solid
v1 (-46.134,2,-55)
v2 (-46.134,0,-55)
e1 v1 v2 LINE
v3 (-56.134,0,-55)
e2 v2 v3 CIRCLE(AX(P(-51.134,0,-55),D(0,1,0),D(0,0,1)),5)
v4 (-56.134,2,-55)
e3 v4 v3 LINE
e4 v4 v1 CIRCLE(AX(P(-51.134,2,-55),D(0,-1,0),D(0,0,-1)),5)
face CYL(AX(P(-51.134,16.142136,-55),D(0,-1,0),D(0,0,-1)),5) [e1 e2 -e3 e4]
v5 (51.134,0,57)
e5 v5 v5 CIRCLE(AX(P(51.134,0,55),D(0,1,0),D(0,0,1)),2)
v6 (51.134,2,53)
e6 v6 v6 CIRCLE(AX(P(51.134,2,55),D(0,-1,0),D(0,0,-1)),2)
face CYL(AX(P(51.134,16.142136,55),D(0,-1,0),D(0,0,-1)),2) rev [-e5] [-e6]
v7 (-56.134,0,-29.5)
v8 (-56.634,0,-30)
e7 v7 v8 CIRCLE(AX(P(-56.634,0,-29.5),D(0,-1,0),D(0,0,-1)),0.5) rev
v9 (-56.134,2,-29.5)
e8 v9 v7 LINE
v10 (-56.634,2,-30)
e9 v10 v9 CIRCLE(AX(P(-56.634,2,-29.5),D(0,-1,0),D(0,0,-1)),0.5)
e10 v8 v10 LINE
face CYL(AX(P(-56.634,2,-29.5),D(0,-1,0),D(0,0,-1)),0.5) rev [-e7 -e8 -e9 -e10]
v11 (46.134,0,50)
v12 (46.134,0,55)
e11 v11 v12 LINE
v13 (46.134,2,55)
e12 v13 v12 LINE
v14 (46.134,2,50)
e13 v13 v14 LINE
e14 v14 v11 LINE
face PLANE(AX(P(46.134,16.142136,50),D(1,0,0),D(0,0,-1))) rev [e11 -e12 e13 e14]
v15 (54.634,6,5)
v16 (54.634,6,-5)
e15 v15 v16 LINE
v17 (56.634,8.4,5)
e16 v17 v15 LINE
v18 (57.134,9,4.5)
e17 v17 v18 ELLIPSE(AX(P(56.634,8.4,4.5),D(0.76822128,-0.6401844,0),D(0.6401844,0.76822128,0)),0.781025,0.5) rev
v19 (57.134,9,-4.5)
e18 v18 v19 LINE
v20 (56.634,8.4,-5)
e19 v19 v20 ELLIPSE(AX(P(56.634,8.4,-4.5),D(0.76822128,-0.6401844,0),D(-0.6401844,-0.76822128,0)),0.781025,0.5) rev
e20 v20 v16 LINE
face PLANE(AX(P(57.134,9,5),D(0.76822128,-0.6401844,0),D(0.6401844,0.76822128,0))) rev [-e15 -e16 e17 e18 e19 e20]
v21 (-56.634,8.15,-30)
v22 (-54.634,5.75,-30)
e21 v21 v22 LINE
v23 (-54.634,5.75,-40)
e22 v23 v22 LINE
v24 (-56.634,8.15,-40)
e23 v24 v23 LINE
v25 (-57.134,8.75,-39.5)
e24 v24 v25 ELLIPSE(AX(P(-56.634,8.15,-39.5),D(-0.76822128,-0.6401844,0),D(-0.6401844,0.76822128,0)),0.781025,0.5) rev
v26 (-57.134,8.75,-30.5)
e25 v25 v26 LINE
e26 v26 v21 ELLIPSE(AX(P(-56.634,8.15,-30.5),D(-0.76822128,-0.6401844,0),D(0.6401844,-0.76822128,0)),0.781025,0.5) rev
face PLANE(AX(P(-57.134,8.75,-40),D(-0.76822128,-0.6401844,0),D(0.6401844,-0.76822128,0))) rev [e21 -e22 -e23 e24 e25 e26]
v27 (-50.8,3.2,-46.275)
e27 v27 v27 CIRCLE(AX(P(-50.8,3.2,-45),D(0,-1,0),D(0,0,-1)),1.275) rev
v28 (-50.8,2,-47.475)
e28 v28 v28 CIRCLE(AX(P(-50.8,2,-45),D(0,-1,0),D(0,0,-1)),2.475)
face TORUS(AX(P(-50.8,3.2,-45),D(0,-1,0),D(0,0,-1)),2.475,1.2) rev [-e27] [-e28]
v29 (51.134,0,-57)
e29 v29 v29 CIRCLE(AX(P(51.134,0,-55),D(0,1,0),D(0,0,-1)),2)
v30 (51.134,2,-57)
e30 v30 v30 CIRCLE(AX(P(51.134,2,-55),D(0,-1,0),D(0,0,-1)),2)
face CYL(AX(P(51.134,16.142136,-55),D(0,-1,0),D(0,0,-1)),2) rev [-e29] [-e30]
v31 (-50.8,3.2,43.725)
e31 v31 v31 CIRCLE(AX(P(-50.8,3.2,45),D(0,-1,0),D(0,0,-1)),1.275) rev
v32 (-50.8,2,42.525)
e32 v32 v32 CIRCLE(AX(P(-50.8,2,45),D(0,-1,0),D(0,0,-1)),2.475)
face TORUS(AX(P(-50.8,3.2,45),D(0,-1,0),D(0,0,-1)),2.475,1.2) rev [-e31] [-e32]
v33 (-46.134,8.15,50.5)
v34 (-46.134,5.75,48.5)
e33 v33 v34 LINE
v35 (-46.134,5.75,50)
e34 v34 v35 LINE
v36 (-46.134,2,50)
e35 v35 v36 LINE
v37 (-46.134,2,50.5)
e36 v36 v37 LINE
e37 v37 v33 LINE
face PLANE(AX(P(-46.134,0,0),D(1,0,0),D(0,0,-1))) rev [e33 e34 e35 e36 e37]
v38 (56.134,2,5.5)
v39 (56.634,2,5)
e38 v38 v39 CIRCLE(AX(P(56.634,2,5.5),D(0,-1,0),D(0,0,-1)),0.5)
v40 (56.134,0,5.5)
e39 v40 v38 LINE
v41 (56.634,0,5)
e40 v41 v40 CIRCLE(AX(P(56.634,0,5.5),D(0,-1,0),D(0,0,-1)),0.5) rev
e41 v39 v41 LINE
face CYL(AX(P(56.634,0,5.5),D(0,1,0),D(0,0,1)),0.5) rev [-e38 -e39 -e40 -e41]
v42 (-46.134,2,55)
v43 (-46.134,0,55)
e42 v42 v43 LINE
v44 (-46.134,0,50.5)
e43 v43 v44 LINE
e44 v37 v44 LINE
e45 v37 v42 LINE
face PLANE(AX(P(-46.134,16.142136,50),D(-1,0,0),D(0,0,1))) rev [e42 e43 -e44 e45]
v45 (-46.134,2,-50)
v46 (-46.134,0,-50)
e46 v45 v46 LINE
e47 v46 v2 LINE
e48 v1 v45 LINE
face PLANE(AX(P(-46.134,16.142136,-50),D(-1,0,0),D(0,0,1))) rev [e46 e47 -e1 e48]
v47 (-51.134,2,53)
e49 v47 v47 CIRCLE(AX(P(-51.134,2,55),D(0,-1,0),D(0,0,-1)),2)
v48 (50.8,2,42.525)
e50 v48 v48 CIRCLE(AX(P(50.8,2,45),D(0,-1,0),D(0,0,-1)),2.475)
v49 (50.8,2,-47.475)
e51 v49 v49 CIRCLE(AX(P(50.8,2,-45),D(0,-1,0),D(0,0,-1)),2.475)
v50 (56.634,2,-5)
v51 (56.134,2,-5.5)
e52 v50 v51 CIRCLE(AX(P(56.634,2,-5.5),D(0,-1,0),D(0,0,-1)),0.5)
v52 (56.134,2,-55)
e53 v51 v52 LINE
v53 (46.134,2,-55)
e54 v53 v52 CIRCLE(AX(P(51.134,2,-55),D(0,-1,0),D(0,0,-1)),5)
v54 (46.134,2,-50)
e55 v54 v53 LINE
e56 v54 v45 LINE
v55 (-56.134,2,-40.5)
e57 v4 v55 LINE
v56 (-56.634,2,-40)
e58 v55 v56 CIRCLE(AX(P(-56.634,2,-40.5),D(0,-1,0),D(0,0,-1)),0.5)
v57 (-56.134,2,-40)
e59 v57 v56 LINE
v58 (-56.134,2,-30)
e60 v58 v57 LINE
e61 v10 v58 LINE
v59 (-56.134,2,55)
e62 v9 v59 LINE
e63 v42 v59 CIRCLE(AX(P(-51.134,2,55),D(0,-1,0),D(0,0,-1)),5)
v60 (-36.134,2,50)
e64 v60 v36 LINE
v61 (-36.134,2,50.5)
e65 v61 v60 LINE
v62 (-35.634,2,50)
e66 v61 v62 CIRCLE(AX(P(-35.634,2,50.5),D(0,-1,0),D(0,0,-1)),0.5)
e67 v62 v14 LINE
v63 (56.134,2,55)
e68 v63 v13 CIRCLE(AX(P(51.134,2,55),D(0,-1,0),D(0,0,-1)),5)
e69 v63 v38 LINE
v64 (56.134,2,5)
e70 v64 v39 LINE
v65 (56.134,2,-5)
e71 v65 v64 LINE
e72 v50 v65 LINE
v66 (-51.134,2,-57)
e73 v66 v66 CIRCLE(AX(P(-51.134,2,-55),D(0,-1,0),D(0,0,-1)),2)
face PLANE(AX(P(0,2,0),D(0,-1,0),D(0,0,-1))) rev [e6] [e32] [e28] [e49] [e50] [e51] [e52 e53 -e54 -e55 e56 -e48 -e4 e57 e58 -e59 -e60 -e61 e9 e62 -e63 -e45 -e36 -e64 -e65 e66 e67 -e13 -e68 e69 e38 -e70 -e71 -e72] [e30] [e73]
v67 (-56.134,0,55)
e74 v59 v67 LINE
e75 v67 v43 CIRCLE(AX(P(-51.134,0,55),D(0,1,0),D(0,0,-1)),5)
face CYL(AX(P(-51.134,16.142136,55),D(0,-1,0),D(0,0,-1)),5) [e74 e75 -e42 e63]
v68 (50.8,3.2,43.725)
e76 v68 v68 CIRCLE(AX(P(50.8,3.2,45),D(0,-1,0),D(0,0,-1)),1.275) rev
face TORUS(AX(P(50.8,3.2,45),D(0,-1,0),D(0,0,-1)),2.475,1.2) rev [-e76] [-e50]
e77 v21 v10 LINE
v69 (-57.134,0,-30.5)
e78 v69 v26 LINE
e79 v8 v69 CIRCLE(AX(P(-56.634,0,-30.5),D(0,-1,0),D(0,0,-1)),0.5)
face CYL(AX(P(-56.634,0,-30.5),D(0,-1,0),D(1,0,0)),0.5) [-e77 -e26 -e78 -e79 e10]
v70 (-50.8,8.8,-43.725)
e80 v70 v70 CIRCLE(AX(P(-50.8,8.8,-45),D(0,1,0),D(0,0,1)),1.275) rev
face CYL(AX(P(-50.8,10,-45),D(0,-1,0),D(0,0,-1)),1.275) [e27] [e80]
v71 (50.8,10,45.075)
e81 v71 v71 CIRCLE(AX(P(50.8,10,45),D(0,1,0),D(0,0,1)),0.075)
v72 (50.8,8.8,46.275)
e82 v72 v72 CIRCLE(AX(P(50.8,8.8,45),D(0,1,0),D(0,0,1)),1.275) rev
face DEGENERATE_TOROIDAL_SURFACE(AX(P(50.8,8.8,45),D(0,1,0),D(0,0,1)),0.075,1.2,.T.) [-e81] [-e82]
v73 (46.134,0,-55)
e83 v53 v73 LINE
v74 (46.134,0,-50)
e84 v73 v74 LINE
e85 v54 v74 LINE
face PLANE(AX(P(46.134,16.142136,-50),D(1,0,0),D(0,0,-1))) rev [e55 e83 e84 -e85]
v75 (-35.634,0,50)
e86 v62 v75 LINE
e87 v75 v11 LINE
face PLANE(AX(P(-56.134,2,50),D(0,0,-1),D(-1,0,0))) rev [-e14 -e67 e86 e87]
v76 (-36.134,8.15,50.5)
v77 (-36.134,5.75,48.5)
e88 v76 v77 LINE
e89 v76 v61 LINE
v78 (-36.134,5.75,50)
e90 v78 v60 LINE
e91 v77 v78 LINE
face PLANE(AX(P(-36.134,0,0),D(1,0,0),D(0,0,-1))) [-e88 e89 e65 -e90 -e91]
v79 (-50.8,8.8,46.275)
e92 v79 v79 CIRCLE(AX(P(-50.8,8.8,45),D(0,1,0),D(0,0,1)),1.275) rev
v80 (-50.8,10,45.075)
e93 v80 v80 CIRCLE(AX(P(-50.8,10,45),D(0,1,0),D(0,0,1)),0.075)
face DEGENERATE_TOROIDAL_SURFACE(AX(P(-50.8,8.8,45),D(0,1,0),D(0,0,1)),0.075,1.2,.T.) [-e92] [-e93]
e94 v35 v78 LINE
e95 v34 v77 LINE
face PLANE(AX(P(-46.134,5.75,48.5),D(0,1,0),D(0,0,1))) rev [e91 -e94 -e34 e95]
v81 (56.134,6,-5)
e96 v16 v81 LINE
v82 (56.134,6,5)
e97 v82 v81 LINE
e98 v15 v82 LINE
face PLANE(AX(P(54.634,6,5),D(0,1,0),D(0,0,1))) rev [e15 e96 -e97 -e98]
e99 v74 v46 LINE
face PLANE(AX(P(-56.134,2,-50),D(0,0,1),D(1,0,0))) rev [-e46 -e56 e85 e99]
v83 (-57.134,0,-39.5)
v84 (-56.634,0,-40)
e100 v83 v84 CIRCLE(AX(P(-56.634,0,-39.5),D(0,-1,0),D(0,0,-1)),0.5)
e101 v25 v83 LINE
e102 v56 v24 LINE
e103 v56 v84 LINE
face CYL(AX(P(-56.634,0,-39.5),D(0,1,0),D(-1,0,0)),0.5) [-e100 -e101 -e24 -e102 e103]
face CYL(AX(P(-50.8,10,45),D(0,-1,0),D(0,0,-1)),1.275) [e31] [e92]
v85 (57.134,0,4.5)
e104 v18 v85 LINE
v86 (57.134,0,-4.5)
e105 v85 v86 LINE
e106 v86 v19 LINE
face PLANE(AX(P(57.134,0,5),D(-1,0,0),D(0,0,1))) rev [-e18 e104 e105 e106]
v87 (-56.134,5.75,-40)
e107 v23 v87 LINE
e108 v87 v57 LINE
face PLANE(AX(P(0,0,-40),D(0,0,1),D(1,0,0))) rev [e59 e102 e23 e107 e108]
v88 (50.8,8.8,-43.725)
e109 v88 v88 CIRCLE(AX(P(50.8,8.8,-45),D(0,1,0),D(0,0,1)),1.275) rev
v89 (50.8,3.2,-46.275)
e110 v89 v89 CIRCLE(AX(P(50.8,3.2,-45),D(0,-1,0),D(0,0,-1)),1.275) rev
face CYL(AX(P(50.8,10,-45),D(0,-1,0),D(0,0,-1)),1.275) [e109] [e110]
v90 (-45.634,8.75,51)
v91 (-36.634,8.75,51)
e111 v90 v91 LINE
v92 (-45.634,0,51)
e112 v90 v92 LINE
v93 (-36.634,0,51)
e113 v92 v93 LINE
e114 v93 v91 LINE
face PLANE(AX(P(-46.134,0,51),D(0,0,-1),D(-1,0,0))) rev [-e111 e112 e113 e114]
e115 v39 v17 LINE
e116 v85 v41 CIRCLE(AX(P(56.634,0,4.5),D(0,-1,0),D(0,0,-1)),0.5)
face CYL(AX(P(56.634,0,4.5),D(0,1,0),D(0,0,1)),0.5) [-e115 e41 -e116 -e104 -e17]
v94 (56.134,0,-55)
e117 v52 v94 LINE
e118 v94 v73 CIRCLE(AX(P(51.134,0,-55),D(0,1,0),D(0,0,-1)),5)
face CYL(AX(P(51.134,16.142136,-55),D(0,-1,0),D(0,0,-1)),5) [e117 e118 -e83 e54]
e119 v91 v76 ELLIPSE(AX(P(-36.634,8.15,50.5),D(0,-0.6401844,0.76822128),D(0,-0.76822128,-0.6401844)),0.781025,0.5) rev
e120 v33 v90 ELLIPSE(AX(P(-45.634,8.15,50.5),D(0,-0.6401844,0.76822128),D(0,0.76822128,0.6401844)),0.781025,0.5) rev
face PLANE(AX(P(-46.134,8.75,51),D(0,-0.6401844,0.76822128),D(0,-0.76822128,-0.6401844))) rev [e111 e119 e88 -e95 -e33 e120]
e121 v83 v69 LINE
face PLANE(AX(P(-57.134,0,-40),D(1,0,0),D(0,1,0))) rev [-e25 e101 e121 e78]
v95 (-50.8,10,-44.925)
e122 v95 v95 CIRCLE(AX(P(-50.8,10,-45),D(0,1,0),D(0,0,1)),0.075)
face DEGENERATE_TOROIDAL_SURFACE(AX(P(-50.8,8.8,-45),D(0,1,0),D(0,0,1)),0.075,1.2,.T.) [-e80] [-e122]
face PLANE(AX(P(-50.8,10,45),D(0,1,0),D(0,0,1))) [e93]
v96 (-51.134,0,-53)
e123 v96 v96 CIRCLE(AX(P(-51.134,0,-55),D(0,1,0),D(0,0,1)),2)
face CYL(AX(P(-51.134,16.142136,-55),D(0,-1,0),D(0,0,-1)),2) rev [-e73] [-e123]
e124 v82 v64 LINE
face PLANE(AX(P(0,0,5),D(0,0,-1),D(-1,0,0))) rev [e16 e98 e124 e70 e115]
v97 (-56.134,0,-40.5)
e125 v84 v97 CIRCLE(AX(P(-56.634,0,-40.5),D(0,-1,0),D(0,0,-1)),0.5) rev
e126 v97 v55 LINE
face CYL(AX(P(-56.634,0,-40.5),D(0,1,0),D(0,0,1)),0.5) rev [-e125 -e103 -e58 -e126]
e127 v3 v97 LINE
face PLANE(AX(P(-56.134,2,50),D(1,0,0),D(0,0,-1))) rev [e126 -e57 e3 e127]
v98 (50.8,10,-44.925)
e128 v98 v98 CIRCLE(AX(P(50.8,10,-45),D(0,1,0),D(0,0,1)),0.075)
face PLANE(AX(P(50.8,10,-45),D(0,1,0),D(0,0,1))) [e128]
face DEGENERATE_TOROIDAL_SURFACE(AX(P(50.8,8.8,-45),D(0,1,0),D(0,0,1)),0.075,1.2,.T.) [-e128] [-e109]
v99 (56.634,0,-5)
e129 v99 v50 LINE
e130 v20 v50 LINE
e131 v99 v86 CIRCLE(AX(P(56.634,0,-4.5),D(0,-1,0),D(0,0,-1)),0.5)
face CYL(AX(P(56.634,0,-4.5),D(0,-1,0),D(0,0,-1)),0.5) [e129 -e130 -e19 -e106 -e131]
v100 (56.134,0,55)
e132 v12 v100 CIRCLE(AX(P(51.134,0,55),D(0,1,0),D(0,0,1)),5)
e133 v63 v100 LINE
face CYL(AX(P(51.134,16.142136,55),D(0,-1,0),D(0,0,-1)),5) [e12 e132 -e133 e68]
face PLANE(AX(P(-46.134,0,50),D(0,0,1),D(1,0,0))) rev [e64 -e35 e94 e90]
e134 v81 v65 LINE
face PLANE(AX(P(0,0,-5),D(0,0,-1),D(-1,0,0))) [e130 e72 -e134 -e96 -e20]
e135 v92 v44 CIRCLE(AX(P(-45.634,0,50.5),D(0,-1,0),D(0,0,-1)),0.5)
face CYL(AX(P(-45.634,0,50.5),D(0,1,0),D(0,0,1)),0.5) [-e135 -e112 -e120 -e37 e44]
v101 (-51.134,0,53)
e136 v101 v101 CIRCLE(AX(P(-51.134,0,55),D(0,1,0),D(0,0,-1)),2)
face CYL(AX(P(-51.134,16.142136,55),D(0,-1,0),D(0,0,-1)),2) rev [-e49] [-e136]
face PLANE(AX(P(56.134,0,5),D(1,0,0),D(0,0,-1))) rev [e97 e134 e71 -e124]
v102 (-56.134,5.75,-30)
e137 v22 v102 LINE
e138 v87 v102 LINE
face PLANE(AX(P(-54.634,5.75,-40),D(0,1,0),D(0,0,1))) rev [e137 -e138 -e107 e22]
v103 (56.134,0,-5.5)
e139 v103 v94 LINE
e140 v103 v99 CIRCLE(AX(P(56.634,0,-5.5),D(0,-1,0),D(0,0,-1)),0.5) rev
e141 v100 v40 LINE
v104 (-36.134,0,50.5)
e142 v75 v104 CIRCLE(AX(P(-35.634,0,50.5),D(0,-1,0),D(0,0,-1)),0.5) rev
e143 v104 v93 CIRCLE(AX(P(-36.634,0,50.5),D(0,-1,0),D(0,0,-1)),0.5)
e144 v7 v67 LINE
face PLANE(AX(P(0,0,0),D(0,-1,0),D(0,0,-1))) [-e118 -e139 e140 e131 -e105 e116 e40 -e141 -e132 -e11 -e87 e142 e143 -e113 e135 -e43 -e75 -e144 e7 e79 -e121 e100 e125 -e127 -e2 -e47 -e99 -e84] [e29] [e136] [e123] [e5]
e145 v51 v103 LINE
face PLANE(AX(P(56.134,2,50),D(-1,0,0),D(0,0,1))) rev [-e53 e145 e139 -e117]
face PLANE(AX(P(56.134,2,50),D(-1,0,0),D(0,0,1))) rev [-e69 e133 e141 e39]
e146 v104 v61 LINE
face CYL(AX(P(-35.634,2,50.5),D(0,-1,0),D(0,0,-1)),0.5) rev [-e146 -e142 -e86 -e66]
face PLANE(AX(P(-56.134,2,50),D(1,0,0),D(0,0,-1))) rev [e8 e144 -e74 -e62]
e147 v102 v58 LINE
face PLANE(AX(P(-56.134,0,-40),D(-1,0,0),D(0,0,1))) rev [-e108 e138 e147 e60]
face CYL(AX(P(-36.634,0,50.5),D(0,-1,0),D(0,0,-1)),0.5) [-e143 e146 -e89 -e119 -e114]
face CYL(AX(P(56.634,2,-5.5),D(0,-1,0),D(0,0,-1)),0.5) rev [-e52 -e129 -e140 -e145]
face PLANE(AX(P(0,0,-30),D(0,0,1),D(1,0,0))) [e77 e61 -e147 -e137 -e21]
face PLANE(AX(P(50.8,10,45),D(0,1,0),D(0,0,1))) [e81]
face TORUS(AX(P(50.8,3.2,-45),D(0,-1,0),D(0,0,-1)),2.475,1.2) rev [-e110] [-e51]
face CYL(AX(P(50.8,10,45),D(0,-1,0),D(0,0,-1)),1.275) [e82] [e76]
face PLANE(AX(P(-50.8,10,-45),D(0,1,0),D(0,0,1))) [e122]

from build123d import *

# Parameters (mm, degrees)
SKETCH2_W           = 112.268
SKETCH2_H           = 100
BOSS_EXTRUDE2_DEPTH = 2
SKETCH1_R           = 1.275
BOSS_EXTRUDE1_DEPTH = 10
BOSS_EXTRUDE3_DEPTH = 5
BOSS_EXTRUDE4_DEPTH = 5
BOSS_EXTRUDE5_DEPTH = 5
FILLET1_R           = 1.2
FILLET2_R           = 0.5
SKETCH6_R           = 2
BOSS_EXTRUDE6_DEPTH = 2


with BuildPart() as part:
    # Sketch2 → Boss-Extrude2 (new body)
    with BuildSketch(Plane(origin=(0, 0, 0), x_dir=(1, 0, 0), z_dir=(0, 1, 0))):
        Rectangle(SKETCH2_W, SKETCH2_H)
    extrude(amount=BOSS_EXTRUDE2_DEPTH)

    # Sketch1 → Boss-Extrude1 (add)
    with BuildSketch(Plane(origin=(0, 0, 0), x_dir=(1, 0, 0), z_dir=(0, 1, 0))):
        with Locations(Location((-50.8, 45, 0), (0, 0, 90))):
            Circle(SKETCH1_R)
        with Locations(Location((50.8, 45, 0), (0, 0, 90))):
            Circle(SKETCH1_R)
        with Locations(Location((50.8, -45, 0), (0, 0, 90))):
            Circle(SKETCH1_R)
        with Locations(Location((-50.8, -45, 0), (0, 0, 90))):
            Circle(SKETCH1_R)
    extrude(amount=BOSS_EXTRUDE1_DEPTH)

    # Sketch3 → Boss-Extrude3 (add, symmetric)
    with BuildSketch(Plane.XY):
        Polygon((57.134, 9), (54.634, 6), (56.134, 6), (56.134, 0), (57.134, 0), align=None)
    extrude(amount=BOSS_EXTRUDE3_DEPTH, both=True)

    # Sketch4 → Boss-Extrude4 (add, symmetric)
    with BuildSketch(Plane.ZY.offset(41.134)):
        Polygon((51, 8.75), (48.5, 5.75), (50, 5.75), (50, 0), (51, 0), align=None)
    extrude(amount=BOSS_EXTRUDE4_DEPTH, both=True)

    # Sketch5 → Boss-Extrude5 (add, symmetric)
    with BuildSketch(Plane(origin=(0, 0, -35), x_dir=(-1, 0, 0), z_dir=(0, 0, -1))):
        Polygon((57.134, 8.75), (54.634, 5.75), (56.134, 5.75), (56.134, 0), (57.134, 0), align=None)
    extrude(amount=BOSS_EXTRUDE5_DEPTH, both=True)

    # Fillet1
    fillet1_edges = [part.edges().sort_by_distance(p)[0] for p in [
        (50.8, 2, -43.725),
        (50.8, 10, -43.725),
        (50.8, 2, 46.275),
        (50.8, 10, 46.275),
        (-50.8, 2, -43.725),
        (-50.8, 10, -43.725),
        (-50.8, 2, 46.275),
        (-50.8, 10, 46.275),
    ]]
    fillet(fillet1_edges, radius=FILLET1_R)

    # Fillet2
    fillet2_edges = [part.edges().sort_by_distance(p)[0] for p in [
        (-56.134, 1, -30),
        (-56.134, 1, -40),
        (56.134, 1, 5),
        (56.134, 1, -5),
        (-46.134, 1, 50),
        (-36.134, 1, 50),
        (-57.134, 4.375, -30),
        (-57.134, 4.375, -40),
        (57.134, 4.5, -5),
        (57.134, 4.5, 5),
        (-36.134, 4.375, 51),
        (-46.134, 4.375, 51),
    ]]
    fillet(fillet2_edges, radius=FILLET2_R - 0.0001)  # a hair under: the kernel refuses the full size

    # Sketch6 → Boss-Extrude6 (add)
    # profile 1 of 4: a face of its own
    with BuildSketch(Plane(origin=(0, 0, 0), x_dir=(1, 0, 0), z_dir=(0, 1, 0))):
        with BuildLine():
            Line((56.134, -50), (46.134, -50))
            Line((46.134, -50), (46.134, -55))
            ThreePointArc((46.134, -55), (51.134, -60), (56.134, -55))
            Line((56.134, -55), (56.134, -50))
        make_face()
        with Locations(Location((51.134, -55, 0), (0, 0, 90))):
            Circle(SKETCH6_R, mode=Mode.SUBTRACT)
    # profile 2 of 4: a face of its own
    with BuildSketch(Plane(origin=(0, 0, 0), x_dir=(1, 0, 0), z_dir=(0, 1, 0))):
        with BuildLine():
            Line((46.134, 50), (46.134, 55))
            ThreePointArc((46.134, 55), (51.134, 60), (56.134, 55))
            Line((56.134, 55), (56.134, 50))
            Line((56.134, 50), (46.134, 50))
        make_face()
        with Locations(Location((51.134, 55, 0), (0, 0, 90))):
            Circle(SKETCH6_R, mode=Mode.SUBTRACT)
    # profile 3 of 4: a face of its own
    with BuildSketch(Plane(origin=(0, 0, 0), x_dir=(1, 0, 0), z_dir=(0, 1, 0))):
        with BuildLine():
            Line((-56.134, 50), (-46.134, 50))
            Line((-46.134, 50), (-46.134, 55))
            ThreePointArc((-46.134, 55), (-51.134, 60), (-56.134, 55))
            Line((-56.134, 55), (-56.134, 50))
        make_face()
        with Locations(Location((-51.134, 55, 0), (0, 0, 90))):
            Circle(SKETCH6_R, mode=Mode.SUBTRACT)
    # profile 4 of 4: a face of its own
    with BuildSketch(Plane(origin=(0, 0, 0), x_dir=(1, 0, 0), z_dir=(0, 1, 0))):
        with BuildLine():
            Line((-46.134, -50), (-46.134, -55))
            ThreePointArc((-46.134, -55), (-51.134, -60), (-56.134, -55))
            Line((-56.134, -55), (-56.134, -50))
            Line((-56.134, -50), (-46.134, -50))
        make_face()
        with Locations(Location((-51.134, -55, 0), (0, 0, 90))):
            Circle(SKETCH6_R, mode=Mode.SUBTRACT)
    extrude(amount=BOSS_EXTRUDE6_DEPTH)


solid = part.part
